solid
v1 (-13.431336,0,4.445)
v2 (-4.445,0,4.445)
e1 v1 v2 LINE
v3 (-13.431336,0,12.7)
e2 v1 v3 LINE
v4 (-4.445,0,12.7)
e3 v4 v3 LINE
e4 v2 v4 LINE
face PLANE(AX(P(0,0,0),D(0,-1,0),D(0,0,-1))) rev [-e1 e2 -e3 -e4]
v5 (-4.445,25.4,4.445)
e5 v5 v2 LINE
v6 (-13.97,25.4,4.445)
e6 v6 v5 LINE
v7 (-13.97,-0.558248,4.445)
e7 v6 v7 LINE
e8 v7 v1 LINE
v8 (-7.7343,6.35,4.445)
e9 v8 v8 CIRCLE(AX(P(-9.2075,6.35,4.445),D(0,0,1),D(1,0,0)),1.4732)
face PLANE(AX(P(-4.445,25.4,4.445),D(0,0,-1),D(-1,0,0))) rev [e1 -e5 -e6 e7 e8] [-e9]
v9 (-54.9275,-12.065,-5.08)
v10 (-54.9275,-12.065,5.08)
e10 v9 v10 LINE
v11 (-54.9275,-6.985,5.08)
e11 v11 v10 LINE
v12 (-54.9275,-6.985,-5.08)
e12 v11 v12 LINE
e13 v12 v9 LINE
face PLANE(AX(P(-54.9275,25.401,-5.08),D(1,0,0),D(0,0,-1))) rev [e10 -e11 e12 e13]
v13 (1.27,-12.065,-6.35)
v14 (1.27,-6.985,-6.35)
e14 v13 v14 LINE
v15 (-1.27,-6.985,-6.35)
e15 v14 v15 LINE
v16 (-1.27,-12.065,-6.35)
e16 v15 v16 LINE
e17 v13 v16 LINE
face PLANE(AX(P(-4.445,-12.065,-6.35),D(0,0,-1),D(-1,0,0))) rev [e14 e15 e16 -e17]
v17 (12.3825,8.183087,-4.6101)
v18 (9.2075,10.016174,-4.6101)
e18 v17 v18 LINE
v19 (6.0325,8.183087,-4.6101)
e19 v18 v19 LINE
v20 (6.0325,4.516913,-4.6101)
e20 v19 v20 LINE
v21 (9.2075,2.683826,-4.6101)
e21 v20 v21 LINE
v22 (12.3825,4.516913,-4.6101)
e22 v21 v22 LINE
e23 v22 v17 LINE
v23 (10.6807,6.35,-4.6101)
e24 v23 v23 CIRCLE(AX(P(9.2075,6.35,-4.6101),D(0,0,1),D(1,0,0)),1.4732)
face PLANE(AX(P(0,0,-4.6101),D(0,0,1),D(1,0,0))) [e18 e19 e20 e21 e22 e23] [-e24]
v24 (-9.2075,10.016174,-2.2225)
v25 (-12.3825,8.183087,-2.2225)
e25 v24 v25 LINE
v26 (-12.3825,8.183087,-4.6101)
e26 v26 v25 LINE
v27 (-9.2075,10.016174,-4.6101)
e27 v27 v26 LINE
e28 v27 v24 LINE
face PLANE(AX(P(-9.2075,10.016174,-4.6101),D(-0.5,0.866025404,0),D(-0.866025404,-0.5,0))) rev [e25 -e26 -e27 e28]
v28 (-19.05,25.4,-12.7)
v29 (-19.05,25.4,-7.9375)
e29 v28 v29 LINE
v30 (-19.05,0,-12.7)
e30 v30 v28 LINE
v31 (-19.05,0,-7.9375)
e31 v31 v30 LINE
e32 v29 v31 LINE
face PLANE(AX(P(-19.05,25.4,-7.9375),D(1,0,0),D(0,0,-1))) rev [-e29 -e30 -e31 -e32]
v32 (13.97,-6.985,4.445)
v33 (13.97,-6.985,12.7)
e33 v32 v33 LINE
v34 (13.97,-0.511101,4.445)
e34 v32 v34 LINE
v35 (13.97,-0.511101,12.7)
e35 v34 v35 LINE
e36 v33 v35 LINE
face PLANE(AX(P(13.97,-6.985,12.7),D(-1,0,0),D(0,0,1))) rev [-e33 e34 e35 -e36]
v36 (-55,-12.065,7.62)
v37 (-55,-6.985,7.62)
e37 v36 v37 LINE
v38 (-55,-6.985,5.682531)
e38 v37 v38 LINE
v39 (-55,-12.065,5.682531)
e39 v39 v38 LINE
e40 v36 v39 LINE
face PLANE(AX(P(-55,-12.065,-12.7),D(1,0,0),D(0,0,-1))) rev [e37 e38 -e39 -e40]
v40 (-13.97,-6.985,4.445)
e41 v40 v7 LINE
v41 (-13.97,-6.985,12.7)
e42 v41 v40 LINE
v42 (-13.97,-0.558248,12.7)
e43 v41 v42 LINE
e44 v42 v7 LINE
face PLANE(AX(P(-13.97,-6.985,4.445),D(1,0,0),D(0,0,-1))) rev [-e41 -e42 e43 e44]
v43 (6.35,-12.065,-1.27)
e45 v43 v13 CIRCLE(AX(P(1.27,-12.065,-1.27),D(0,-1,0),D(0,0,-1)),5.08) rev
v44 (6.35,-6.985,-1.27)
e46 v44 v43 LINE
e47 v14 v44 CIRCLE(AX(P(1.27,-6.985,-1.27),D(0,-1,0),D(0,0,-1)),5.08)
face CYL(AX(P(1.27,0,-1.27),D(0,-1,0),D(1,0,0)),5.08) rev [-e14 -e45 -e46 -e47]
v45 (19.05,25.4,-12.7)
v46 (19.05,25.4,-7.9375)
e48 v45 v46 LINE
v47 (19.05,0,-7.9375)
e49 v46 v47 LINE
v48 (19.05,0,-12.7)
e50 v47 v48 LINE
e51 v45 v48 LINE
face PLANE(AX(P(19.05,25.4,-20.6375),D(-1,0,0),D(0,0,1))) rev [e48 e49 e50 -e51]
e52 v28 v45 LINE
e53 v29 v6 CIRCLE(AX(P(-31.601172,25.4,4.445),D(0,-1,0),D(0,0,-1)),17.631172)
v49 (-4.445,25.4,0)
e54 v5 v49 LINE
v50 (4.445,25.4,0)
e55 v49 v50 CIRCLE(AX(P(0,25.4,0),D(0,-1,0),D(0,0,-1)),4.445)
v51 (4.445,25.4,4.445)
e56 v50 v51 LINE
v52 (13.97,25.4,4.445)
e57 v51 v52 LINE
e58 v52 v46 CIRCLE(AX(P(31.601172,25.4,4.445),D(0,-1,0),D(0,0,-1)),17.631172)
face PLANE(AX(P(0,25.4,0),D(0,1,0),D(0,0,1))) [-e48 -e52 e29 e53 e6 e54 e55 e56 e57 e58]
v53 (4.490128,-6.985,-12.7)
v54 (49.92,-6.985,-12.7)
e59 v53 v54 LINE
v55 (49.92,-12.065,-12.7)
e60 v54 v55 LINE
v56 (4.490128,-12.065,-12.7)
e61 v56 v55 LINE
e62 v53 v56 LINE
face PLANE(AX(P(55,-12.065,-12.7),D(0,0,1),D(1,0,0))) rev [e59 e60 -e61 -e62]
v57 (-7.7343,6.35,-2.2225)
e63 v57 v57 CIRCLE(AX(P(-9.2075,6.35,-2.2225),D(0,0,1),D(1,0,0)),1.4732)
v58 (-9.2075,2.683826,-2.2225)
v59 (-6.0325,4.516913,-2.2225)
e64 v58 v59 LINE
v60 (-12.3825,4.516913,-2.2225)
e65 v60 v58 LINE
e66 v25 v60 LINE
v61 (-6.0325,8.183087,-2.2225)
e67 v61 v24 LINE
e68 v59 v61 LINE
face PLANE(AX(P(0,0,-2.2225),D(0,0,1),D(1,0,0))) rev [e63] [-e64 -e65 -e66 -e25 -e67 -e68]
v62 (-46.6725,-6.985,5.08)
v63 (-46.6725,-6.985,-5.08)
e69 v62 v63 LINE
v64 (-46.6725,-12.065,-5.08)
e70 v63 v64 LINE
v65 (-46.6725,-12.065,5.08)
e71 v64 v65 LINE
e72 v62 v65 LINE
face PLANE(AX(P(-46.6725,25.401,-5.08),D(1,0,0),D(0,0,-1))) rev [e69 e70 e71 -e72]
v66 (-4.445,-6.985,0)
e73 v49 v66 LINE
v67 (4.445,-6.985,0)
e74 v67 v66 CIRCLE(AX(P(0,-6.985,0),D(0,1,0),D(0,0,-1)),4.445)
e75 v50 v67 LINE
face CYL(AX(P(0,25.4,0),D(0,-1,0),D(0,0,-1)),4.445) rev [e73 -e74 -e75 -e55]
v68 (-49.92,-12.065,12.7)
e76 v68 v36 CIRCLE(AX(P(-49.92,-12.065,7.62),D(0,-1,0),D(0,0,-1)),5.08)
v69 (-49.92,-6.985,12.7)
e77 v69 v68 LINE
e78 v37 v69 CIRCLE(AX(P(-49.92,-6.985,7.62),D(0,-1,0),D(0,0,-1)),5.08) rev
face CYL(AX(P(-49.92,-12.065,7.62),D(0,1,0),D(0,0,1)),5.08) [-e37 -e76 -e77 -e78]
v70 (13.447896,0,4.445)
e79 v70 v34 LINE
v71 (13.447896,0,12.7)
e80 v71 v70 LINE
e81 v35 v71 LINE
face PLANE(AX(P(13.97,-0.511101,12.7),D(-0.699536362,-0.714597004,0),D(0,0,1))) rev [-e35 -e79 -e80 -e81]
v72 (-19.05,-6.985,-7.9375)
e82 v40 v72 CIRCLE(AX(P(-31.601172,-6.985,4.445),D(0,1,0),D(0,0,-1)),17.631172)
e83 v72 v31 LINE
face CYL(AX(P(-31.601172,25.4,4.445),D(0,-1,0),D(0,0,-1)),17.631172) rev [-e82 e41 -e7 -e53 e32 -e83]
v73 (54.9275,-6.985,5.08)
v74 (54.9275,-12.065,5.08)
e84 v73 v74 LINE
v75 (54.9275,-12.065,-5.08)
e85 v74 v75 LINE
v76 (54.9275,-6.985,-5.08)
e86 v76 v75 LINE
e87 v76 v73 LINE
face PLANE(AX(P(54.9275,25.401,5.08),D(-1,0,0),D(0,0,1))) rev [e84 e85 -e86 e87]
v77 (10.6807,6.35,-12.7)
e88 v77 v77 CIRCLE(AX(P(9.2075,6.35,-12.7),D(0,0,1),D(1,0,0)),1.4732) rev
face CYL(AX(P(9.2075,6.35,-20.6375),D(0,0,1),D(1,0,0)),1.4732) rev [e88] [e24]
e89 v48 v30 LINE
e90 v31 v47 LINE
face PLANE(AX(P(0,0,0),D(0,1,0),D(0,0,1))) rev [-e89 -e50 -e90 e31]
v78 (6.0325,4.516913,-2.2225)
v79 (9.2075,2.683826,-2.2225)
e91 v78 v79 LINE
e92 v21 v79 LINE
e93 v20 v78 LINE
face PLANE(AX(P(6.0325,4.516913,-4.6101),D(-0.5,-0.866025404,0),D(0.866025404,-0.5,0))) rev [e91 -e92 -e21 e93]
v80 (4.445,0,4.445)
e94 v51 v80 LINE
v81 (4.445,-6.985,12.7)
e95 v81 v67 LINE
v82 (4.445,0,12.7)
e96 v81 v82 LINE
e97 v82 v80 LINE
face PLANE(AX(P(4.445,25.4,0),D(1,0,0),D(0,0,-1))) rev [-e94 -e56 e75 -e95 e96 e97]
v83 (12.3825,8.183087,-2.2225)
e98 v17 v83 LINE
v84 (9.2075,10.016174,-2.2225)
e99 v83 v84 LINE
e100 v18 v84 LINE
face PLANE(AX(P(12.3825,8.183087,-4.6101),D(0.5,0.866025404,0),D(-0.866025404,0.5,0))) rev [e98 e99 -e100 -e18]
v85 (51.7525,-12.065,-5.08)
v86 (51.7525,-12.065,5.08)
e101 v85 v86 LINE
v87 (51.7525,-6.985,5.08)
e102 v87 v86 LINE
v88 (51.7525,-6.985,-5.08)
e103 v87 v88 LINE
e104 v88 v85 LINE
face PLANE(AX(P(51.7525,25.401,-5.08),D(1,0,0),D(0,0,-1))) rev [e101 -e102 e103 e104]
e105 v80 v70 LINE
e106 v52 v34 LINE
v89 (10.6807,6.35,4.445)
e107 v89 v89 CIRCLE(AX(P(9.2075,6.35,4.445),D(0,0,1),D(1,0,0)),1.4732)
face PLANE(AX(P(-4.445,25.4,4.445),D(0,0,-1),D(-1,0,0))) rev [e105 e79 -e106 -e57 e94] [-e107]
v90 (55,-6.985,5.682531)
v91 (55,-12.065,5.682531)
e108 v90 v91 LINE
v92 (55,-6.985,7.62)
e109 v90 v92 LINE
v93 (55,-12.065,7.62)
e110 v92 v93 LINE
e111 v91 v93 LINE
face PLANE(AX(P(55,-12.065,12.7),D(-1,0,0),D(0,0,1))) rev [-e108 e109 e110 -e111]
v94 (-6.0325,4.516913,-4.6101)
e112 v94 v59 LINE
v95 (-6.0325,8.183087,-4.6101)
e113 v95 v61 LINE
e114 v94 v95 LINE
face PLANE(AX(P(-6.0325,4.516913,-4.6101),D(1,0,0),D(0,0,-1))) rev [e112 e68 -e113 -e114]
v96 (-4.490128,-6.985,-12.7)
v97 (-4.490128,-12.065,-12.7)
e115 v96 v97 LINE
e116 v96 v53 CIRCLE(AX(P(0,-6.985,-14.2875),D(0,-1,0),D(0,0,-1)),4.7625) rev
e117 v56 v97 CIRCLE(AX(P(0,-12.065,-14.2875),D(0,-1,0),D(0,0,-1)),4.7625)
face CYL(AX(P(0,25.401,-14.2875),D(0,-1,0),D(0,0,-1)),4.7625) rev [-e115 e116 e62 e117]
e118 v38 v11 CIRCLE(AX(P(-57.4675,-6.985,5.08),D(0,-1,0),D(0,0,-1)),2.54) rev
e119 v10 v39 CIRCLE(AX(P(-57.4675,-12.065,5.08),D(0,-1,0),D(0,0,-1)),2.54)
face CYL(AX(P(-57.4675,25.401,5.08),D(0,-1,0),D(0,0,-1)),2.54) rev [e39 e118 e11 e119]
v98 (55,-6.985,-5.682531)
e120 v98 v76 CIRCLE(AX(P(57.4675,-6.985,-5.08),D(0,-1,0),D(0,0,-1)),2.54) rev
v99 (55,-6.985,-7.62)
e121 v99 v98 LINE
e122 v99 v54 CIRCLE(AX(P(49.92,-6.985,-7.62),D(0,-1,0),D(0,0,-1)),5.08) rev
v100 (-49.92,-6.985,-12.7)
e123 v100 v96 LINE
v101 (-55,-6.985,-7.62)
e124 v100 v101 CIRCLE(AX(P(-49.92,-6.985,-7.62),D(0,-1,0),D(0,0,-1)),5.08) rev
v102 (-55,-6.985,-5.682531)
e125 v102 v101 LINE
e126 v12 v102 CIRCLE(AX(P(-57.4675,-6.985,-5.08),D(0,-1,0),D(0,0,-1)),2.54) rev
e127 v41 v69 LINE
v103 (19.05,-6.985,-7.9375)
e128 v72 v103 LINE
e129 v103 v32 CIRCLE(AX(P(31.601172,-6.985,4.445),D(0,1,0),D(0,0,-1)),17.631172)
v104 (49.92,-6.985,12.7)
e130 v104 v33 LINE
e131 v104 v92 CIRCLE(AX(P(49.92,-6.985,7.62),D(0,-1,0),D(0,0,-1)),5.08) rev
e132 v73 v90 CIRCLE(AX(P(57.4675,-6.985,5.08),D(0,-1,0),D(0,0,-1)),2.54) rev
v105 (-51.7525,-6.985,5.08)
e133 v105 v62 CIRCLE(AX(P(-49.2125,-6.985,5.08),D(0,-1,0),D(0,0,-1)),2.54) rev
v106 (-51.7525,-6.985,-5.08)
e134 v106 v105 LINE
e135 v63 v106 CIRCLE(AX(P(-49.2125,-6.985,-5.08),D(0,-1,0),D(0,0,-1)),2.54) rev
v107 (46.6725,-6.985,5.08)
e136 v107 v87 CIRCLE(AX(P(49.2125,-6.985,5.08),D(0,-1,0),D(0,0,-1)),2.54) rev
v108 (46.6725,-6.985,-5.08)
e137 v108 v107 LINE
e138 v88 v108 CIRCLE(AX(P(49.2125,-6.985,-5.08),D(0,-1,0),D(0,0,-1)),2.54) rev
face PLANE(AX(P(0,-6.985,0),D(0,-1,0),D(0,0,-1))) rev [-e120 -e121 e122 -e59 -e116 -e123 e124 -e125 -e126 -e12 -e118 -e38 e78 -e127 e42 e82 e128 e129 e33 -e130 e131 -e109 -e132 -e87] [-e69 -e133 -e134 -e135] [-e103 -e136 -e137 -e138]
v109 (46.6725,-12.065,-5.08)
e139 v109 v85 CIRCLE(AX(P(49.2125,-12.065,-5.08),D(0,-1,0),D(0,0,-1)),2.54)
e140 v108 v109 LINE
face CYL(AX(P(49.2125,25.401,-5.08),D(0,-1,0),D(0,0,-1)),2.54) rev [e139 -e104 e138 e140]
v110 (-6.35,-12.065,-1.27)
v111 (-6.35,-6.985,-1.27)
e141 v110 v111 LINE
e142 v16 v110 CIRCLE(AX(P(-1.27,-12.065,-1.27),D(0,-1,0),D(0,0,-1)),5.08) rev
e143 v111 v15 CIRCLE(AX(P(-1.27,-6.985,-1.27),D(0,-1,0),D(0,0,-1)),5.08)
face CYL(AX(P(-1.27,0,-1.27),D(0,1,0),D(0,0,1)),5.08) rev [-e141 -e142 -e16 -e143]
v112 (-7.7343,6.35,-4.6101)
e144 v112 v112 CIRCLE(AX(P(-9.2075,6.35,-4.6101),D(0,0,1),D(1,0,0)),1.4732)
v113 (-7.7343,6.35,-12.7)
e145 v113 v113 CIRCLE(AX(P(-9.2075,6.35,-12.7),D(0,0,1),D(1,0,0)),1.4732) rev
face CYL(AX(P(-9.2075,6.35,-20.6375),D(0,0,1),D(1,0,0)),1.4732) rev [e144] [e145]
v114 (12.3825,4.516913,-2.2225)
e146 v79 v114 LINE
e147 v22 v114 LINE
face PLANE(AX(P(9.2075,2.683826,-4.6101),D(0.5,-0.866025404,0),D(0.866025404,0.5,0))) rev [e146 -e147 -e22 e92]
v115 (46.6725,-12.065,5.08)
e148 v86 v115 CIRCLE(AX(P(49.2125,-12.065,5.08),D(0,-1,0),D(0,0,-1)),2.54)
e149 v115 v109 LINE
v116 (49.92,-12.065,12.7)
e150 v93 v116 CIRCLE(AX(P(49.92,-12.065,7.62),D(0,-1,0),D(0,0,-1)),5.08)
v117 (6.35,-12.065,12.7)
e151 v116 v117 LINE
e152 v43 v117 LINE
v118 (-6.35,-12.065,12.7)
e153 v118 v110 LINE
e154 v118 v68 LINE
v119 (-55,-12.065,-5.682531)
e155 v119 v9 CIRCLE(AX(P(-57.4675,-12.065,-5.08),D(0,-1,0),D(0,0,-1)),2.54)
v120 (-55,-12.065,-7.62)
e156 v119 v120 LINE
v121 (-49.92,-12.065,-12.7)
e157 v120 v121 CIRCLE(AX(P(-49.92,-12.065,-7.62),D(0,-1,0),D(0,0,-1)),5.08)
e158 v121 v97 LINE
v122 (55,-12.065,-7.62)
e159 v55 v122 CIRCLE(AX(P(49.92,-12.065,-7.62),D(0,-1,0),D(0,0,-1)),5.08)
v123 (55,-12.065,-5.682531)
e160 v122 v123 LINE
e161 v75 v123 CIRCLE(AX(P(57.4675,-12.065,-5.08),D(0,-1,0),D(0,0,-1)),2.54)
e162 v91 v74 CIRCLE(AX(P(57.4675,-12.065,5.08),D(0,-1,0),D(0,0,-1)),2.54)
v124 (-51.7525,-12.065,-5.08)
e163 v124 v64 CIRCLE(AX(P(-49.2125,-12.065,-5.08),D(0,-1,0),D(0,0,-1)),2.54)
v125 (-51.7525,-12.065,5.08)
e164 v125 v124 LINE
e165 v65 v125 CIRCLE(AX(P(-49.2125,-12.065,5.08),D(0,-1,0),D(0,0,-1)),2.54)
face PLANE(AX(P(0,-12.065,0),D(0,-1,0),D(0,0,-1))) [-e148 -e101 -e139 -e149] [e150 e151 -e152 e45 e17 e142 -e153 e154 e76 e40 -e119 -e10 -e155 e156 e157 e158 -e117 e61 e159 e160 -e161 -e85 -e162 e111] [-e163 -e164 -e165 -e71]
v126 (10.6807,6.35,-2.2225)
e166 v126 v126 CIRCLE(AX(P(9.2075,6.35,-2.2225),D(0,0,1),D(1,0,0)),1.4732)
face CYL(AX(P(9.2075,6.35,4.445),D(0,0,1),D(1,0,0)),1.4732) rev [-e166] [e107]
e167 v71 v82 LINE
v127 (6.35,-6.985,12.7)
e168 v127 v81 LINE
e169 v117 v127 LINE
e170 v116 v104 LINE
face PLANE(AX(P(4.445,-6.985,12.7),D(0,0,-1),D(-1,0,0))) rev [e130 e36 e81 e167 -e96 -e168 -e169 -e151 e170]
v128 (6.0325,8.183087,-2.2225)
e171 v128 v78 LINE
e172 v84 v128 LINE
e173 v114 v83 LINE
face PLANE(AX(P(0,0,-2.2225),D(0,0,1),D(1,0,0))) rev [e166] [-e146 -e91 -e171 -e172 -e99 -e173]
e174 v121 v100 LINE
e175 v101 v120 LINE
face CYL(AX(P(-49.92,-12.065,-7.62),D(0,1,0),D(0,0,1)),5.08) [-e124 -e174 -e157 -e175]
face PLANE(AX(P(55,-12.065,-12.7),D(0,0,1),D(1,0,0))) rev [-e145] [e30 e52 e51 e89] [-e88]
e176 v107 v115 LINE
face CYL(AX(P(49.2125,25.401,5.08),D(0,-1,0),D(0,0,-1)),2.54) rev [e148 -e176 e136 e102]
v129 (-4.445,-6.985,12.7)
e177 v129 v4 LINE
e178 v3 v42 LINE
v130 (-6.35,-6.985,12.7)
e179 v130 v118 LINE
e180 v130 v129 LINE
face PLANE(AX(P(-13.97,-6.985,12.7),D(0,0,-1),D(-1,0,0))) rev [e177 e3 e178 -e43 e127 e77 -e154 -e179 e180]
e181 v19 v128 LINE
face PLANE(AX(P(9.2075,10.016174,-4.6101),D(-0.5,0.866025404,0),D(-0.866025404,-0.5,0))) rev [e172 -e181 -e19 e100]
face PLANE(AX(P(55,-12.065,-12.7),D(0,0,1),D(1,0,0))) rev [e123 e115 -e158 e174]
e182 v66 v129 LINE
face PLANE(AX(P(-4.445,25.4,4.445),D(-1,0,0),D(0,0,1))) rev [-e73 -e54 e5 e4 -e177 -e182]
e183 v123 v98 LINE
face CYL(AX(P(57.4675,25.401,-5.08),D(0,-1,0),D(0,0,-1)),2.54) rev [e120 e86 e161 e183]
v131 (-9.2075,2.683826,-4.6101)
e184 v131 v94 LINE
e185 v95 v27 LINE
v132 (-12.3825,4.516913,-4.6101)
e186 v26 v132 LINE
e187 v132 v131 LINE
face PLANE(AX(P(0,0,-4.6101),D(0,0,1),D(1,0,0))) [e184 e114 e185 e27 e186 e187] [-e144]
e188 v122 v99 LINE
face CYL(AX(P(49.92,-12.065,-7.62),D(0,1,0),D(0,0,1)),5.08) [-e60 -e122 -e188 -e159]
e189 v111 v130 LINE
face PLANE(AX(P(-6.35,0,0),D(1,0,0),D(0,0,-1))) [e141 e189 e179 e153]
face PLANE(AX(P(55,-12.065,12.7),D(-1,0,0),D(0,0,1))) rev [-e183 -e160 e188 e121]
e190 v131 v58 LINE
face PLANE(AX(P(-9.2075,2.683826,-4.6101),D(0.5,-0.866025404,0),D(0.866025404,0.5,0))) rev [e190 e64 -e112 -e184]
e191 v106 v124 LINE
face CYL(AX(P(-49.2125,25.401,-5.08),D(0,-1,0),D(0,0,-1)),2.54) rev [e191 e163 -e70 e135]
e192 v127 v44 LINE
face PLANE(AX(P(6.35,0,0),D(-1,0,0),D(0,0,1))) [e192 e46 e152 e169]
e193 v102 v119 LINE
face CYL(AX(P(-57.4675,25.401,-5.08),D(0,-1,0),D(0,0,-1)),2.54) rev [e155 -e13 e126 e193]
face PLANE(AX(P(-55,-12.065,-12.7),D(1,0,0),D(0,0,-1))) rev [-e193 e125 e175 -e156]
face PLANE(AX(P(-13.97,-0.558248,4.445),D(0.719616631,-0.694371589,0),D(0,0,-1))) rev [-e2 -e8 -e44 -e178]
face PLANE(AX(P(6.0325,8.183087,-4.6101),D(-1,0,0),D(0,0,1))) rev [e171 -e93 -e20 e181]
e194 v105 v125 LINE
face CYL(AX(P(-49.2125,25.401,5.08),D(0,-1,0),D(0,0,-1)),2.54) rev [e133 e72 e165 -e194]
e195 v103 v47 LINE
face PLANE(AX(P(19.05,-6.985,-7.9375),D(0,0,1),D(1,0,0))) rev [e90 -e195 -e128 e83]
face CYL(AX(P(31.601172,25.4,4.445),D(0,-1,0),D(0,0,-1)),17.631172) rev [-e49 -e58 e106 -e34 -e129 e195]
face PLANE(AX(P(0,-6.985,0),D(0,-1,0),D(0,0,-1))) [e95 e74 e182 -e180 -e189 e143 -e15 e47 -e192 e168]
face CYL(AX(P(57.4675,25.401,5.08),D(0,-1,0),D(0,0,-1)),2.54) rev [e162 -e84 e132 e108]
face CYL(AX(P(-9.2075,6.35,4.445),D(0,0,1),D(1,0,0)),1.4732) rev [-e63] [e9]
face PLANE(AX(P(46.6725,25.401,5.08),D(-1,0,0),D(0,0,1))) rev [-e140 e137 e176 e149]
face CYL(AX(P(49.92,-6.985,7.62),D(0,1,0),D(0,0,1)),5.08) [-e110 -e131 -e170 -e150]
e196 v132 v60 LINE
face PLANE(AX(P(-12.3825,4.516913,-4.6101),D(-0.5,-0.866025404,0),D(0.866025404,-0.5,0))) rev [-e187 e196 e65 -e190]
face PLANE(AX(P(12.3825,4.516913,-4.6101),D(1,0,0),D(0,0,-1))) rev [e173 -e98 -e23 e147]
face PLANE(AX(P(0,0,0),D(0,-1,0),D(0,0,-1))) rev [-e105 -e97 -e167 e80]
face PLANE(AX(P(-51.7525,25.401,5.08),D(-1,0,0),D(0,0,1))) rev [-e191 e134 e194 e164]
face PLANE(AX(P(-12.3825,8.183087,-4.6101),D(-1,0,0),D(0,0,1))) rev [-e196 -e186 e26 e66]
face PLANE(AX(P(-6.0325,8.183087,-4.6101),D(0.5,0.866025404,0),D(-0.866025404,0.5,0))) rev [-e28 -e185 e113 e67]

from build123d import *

# Parameters (mm, degrees)
CUT_EXTRUDE1_START     = -18.415
CUT_EXTRUDE1_OUTLINE_W = 38.1
CUT_EXTRUDE1_OUTLINE_H = 25.4
CUT_EXTRUDE1_DEPTH     = 25.0825
CUT_EXTRUDE1_2_DEPTH   = 16.0274
CUT_EXTRUDE1_3_DEPTH   = 6.6675
CUT_EXTRUDE2_DEPTH     = 2.3876
CUT_EXTRUDE3_DEPTH     = 38.867781903
CUT_EXTRUDE4_DEPTH     = 38.867781903
CUT_EXTRUDE5_DEPTH     = 38.867781903
BOSS_EXTRUDE1_START    = 6.985
BOSS_EXTRUDE1_DEPTH    = 6.985
BOSS_EXTRUDE2_DEPTH    = 5.08
SKETCH8_W              = 19.05
SKETCH8_H              = 5.08
CUT_EXTRUDE6_DEPTH     = 1.905
SKETCH9_W              = 19.05
SKETCH9_H              = 5.08
CUT_EXTRUDE7_DEPTH     = 1.905
CUT_EXTRUDE8_REACH     = 71.674
CUT_EXTRUDE9_REACH     = 71.674
CUT_EXTRUDE10_REACH    = 71.674
CUT_EXTRUDE11_REACH    = 71.674
CUT_EXTRUDE12_REACH    = 71.674
SKETCH15_W             = 1.4732
SKETCH15_H             = 16.0274
SKETCH16_W             = 1.4732
SKETCH16_H             = 16.0274
M2_5_CLEARANCE_HOLE1_D = 2.9464
FILLET1_R              = 5.08
CHAMFER2_SIZE          = 0.511100582
CHAMFER2_SIZE2         = 0.522104304
CHAMFER3_SIZE          = 0.558247665
CHAMFER3_SIZE2         = 0.538663646
SKETCH27_W             = 38.1
SKETCH27_H             = 25.4
CUT_EXTRUDE13_DEPTH    = 7.9375


with BuildPart() as part:
    # Cut-Extrude1: read off the stored shape, not the designer's step
    # Cut-Extrude1 outline → Cut-Extrude1 (new body)
    with BuildSketch(Plane.XY.offset(-2.2225).offset(CUT_EXTRUDE1_START)):
        with Locations((0, 12.7)):
            Rectangle(CUT_EXTRUDE1_OUTLINE_W, CUT_EXTRUDE1_OUTLINE_H)
        Polygon((-6.0325, 8.183087105), (-6.0325, 4.516912895), (-9.2075, 2.683825791), (-12.3825, 4.516912895), (-12.3825, 8.183087105), (-9.2075, 10.016174209), align=None, mode=Mode.SUBTRACT)
    extrude(amount=CUT_EXTRUDE1_DEPTH)

    # Cut-Extrude1 2 outline → Cut-Extrude1 2 (add)
    with BuildSketch(Plane.XY.offset(-2.2225).offset(CUT_EXTRUDE1_START)):
        Polygon((-9.2075, 2.683825791), (-6.0325, 4.516912895), (-6.0325, 8.183087105), (-9.2075, 10.016174209), (-12.3825, 8.183087105), (-12.3825, 4.516912895), align=None)
    extrude(amount=CUT_EXTRUDE1_2_DEPTH)

    # Cut-Extrude1 3 outline → Cut-Extrude1 3 (add)
    with BuildSketch(Plane.XY.offset(-2.2225)):
        Polygon((-9.2075, 2.683825791), (-6.0325, 4.516912895), (-6.0325, 8.183087105), (-9.2075, 10.016174209), (-12.3825, 8.183087105), (-12.3825, 4.516912895), align=None)
    extrude(amount=CUT_EXTRUDE1_3_DEPTH)

    # Sketch2 → Cut-Extrude2 (cut)
    with BuildSketch(Plane.XY.offset(-2.2225)):
        Polygon((6.0325, 8.183087105), (6.0325, 4.516912895), (9.2075, 2.683825791), (12.3825, 4.516912895), (12.3825, 8.183087105), (9.2075, 10.016174209), align=None)
    extrude(amount=-CUT_EXTRUDE2_DEPTH, mode=Mode.SUBTRACT)

    # Sketch3 → Cut-Extrude3 (cut, through all)
    with BuildSketch(Plane.XZ):
        with BuildLine():
            Line((-13.97, 4.445), (-19.05, 4.445))
            Line((-19.05, 4.445), (-19.05, -7.9375))
            ThreePointArc((-19.05, -7.9375), (-15.289364951, -2.247023353), (-13.97, 4.445))
        make_face()
    extrude(amount=-CUT_EXTRUDE3_DEPTH, mode=Mode.SUBTRACT)

    # Sketch4 → Cut-Extrude4 (cut, through all)
    with BuildSketch(Plane.XZ):
        with BuildLine():
            Line((4.445, 4.445), (-4.445, 4.445))
            Line((-4.445, 4.445), (-4.445, 0))
            ThreePointArc((-4.445, 0), (0, -4.445), (4.445, 0))
            Line((4.445, 0), (4.445, 4.445))
        make_face()
    extrude(amount=-CUT_EXTRUDE4_DEPTH, mode=Mode.SUBTRACT)

    # Sketch5 → Cut-Extrude5 (cut, through all)
    with BuildSketch(Plane.XZ):
        with BuildLine():
            Line((19.05, -7.9375), (19.05, 4.445))
            Line((19.05, 4.445), (13.97, 4.445))
            ThreePointArc((13.97, 4.445), (15.289364951, -2.247023353), (19.05, -7.9375))
        make_face()
    extrude(amount=-CUT_EXTRUDE5_DEPTH, mode=Mode.SUBTRACT)

    # Sketch6 → Boss-Extrude1 (add)
    with BuildSketch(Plane.XZ.offset(BOSS_EXTRUDE1_START)):
        with BuildLine():
            Line((4.445, 0), (4.445, 12.7))
            Line((4.445, 12.7), (13.97, 12.7))
            Line((13.97, 12.7), (13.97, 4.445))
            ThreePointArc((13.97, 4.445), (15.289364951, -2.247023353), (19.05, -7.9375))
            Line((19.05, -7.9375), (-19.05, -7.9375))
            ThreePointArc((-19.05, -7.9375), (-15.289364951, -2.247023353), (-13.97, 4.445))
            Line((-13.97, 4.445), (-13.97, 12.7))
            Line((-13.97, 12.7), (-4.445, 12.7))
            Line((-4.445, 12.7), (-4.445, 0))
            ThreePointArc((-4.445, 0), (0, -4.445), (4.445, 0))
        make_face()
    extrude(amount=-BOSS_EXTRUDE1_DEPTH)

    # Sketch7 → Boss-Extrude2 (add)
    with BuildSketch(Plane.XZ.offset(6.985)):
        Polygon((-4.445, -6.35), (4.445, -6.35), (4.445, 12.7), (55, 12.7), (55, -12.7), (-55, -12.7), (-55, 12.7), (-4.445, 12.7), align=None)
    extrude(amount=BOSS_EXTRUDE2_DEPTH)

    # Sketch8 → Cut-Extrude6 (cut)
    with BuildSketch(Plane.ZY.offset(-4.445)):
        with Locations((3.175, -9.525)):
            Rectangle(SKETCH8_W, SKETCH8_H)
    extrude(amount=-CUT_EXTRUDE6_DEPTH, mode=Mode.SUBTRACT)

    # Sketch9 → Cut-Extrude7 (cut)
    with BuildSketch(Plane(origin=(-4.445, 0, 0), x_dir=(0, 0, -1), z_dir=(1, 0, 0))):
        with Locations((-3.175, -9.525)):
            Rectangle(SKETCH9_W, SKETCH9_H)
    extrude(amount=-CUT_EXTRUDE7_DEPTH, mode=Mode.SUBTRACT)

    # Sketch10 → Cut-Extrude8 (cut, up to next)
    with BuildSketch(Plane.XZ.offset(12.065), mode=Mode.PRIVATE) as cut_extrude8_sk1:
        with BuildLine():
            Line((-4.490128061, -12.7), (4.490128061, -12.7))
            ThreePointArc((4.490128061, -12.7), (0, -9.525), (-4.490128061, -12.7))
        make_face()
    cut_extrude8_tool1 = extrude(cut_extrude8_sk1.sketch, amount=-CUT_EXTRUDE8_REACH, mode=Mode.PRIVATE) & part.part
    add(cut_extrude8_tool1.solids().sort_by_distance((0, -12.065, -11.384864))[0], mode=Mode.SUBTRACT)

    # Sketch11 → Cut-Extrude9 (cut, up to next)
    with BuildSketch(Plane.XZ.offset(12.065), mode=Mode.PRIVATE) as cut_extrude9_sk1:
        with BuildLine():
            Line((60.0075, -5.08), (60.0075, 5.08))
            ThreePointArc((60.0075, 5.08), (57.4675, 7.62), (54.9275, 5.08))
            Line((54.9275, 5.08), (54.9275, -5.08))
            ThreePointArc((54.9275, -5.08), (57.4675, -7.62), (60.0075, -5.08))
        make_face()
    cut_extrude9_tool1 = extrude(cut_extrude9_sk1.sketch, amount=-CUT_EXTRUDE9_REACH, mode=Mode.PRIVATE) & part.part
    add(cut_extrude9_tool1.solids().sort_by_distance((57.4675, -12.065, 0))[0], mode=Mode.SUBTRACT)

    # Sketch12 → Cut-Extrude10 (cut, up to next)
    with BuildSketch(Plane.XZ.offset(12.065), mode=Mode.PRIVATE) as cut_extrude10_sk1:
        with BuildLine():
            Line((51.7525, -5.08), (51.7525, 5.08))
            ThreePointArc((51.7525, 5.08), (49.2125, 7.62), (46.6725, 5.08))
            Line((46.6725, 5.08), (46.6725, -5.08))
            ThreePointArc((46.6725, -5.08), (49.2125, -7.62), (51.7525, -5.08))
        make_face()
    cut_extrude10_tool1 = extrude(cut_extrude10_sk1.sketch, amount=-CUT_EXTRUDE10_REACH, mode=Mode.PRIVATE) & part.part
    add(cut_extrude10_tool1.solids().sort_by_distance((49.2125, -12.065, 0))[0], mode=Mode.SUBTRACT)

    # Sketch13 → Cut-Extrude11 (cut, up to next)
    with BuildSketch(Plane.XZ.offset(12.065), mode=Mode.PRIVATE) as cut_extrude11_sk1:
        with BuildLine():
            Line((-46.6725, -5.08), (-46.6725, 5.08))
            ThreePointArc((-46.6725, 5.08), (-49.2125, 7.62), (-51.7525, 5.08))
            Line((-51.7525, 5.08), (-51.7525, -5.08))
            ThreePointArc((-51.7525, -5.08), (-49.2125, -7.62), (-46.6725, -5.08))
        make_face()
    cut_extrude11_tool1 = extrude(cut_extrude11_sk1.sketch, amount=-CUT_EXTRUDE11_REACH, mode=Mode.PRIVATE) & part.part
    add(cut_extrude11_tool1.solids().sort_by_distance((-49.2125, -12.065, 0))[0], mode=Mode.SUBTRACT)

    # Sketch14 → Cut-Extrude12 (cut, up to next)
    with BuildSketch(Plane.XZ.offset(12.065), mode=Mode.PRIVATE) as cut_extrude12_sk1:
        with BuildLine():
            Line((-54.9275, -5.08), (-54.9275, 5.08))
            ThreePointArc((-54.9275, 5.08), (-57.4675, 7.62), (-60.0075, 5.08))
            Line((-60.0075, 5.08), (-60.0075, -5.08))
            ThreePointArc((-60.0075, -5.08), (-57.4675, -7.62), (-54.9275, -5.08))
        make_face()
    cut_extrude12_tool1 = extrude(cut_extrude12_sk1.sketch, amount=-CUT_EXTRUDE12_REACH, mode=Mode.PRIVATE) & part.part
    add(cut_extrude12_tool1.solids().sort_by_distance((-57.4675, -12.065, 0))[0], mode=Mode.SUBTRACT)

    # Sketch15 → Cut-Revolve1 (revolve, cut)
    with BuildSketch(Plane(origin=(0, 6.35, 0), x_dir=(1, 0, 0), z_dir=(0, 1, 0))):
        with Locations((-8.4709, 12.6238)):
            Rectangle(SKETCH15_W, SKETCH15_H)
    revolve(axis=Axis((-9.2075, 6.35, -20.6375), (0, 0, 1)), mode=Mode.SUBTRACT)

    # Sketch16 → Cut-Revolve2 (revolve, cut)
    with BuildSketch(Plane(origin=(0, 6.35, 0), x_dir=(1, 0, 0), z_dir=(0, 1, 0))):
        with Locations((9.9441, 12.6238)):
            Rectangle(SKETCH16_W, SKETCH16_H)
    revolve(axis=Axis((9.2075, 6.35, -20.6375), (0, 0, 1)), mode=Mode.SUBTRACT)

    # M2.5 Clearance Hole1 (through all)
    with Locations(Plane.XY.offset(4.445)):
        with Locations((9.2075, 6.35), (-9.2075, 6.35)):
            Hole(M2_5_CLEARANCE_HOLE1_D / 2)

    # Fillet1
    fillet1_edges = [part.edges().sort_by_distance(p)[0] for p in [
        (-55, -9.525, 12.7),
        (-55, -9.525, -12.7),
        (55, -9.525, -12.7),
        (55, -9.525, 12.7),
        (6.35, -9.525, -6.35),
        (-6.35, -9.525, -6.35),
    ]]
    fillet(fillet1_edges, radius=FILLET1_R)

    # Chamfer2
    chamfer2_edges = [part.edges().sort_by_distance(p)[0] for p in [
        (13.97, 0, 8.5725),
    ]]
    chamfer2_side = [part.faces().sort_by_distance(p)[0] for p in [
        (13.97, -3.4925, 8.5725),
    ]]
    chamfer(chamfer2_edges, length=CHAMFER2_SIZE, length2=CHAMFER2_SIZE2, reference=chamfer2_side[0])

    # Chamfer3
    chamfer3_edges = [part.edges().sort_by_distance(p)[0] for p in [
        (-13.97, 0, 8.5725),
    ]]
    chamfer3_side = [part.faces().sort_by_distance(p)[0] for p in [
        (-13.97, -3.4925, 8.5725),
    ]]
    chamfer(chamfer3_edges, length=CHAMFER3_SIZE, length2=CHAMFER3_SIZE2, reference=chamfer3_side[0])

    # Sketch27 → Cut-Extrude13 (cut)
    with BuildSketch(Plane(origin=(0, 0, -20.6375), x_dir=(-1, 0, 0), z_dir=(0, 0, -1))):
        with Locations((0, 12.7)):
            Rectangle(SKETCH27_W, SKETCH27_H)
    extrude(amount=-CUT_EXTRUDE13_DEPTH, mode=Mode.SUBTRACT)


solid = part.part
